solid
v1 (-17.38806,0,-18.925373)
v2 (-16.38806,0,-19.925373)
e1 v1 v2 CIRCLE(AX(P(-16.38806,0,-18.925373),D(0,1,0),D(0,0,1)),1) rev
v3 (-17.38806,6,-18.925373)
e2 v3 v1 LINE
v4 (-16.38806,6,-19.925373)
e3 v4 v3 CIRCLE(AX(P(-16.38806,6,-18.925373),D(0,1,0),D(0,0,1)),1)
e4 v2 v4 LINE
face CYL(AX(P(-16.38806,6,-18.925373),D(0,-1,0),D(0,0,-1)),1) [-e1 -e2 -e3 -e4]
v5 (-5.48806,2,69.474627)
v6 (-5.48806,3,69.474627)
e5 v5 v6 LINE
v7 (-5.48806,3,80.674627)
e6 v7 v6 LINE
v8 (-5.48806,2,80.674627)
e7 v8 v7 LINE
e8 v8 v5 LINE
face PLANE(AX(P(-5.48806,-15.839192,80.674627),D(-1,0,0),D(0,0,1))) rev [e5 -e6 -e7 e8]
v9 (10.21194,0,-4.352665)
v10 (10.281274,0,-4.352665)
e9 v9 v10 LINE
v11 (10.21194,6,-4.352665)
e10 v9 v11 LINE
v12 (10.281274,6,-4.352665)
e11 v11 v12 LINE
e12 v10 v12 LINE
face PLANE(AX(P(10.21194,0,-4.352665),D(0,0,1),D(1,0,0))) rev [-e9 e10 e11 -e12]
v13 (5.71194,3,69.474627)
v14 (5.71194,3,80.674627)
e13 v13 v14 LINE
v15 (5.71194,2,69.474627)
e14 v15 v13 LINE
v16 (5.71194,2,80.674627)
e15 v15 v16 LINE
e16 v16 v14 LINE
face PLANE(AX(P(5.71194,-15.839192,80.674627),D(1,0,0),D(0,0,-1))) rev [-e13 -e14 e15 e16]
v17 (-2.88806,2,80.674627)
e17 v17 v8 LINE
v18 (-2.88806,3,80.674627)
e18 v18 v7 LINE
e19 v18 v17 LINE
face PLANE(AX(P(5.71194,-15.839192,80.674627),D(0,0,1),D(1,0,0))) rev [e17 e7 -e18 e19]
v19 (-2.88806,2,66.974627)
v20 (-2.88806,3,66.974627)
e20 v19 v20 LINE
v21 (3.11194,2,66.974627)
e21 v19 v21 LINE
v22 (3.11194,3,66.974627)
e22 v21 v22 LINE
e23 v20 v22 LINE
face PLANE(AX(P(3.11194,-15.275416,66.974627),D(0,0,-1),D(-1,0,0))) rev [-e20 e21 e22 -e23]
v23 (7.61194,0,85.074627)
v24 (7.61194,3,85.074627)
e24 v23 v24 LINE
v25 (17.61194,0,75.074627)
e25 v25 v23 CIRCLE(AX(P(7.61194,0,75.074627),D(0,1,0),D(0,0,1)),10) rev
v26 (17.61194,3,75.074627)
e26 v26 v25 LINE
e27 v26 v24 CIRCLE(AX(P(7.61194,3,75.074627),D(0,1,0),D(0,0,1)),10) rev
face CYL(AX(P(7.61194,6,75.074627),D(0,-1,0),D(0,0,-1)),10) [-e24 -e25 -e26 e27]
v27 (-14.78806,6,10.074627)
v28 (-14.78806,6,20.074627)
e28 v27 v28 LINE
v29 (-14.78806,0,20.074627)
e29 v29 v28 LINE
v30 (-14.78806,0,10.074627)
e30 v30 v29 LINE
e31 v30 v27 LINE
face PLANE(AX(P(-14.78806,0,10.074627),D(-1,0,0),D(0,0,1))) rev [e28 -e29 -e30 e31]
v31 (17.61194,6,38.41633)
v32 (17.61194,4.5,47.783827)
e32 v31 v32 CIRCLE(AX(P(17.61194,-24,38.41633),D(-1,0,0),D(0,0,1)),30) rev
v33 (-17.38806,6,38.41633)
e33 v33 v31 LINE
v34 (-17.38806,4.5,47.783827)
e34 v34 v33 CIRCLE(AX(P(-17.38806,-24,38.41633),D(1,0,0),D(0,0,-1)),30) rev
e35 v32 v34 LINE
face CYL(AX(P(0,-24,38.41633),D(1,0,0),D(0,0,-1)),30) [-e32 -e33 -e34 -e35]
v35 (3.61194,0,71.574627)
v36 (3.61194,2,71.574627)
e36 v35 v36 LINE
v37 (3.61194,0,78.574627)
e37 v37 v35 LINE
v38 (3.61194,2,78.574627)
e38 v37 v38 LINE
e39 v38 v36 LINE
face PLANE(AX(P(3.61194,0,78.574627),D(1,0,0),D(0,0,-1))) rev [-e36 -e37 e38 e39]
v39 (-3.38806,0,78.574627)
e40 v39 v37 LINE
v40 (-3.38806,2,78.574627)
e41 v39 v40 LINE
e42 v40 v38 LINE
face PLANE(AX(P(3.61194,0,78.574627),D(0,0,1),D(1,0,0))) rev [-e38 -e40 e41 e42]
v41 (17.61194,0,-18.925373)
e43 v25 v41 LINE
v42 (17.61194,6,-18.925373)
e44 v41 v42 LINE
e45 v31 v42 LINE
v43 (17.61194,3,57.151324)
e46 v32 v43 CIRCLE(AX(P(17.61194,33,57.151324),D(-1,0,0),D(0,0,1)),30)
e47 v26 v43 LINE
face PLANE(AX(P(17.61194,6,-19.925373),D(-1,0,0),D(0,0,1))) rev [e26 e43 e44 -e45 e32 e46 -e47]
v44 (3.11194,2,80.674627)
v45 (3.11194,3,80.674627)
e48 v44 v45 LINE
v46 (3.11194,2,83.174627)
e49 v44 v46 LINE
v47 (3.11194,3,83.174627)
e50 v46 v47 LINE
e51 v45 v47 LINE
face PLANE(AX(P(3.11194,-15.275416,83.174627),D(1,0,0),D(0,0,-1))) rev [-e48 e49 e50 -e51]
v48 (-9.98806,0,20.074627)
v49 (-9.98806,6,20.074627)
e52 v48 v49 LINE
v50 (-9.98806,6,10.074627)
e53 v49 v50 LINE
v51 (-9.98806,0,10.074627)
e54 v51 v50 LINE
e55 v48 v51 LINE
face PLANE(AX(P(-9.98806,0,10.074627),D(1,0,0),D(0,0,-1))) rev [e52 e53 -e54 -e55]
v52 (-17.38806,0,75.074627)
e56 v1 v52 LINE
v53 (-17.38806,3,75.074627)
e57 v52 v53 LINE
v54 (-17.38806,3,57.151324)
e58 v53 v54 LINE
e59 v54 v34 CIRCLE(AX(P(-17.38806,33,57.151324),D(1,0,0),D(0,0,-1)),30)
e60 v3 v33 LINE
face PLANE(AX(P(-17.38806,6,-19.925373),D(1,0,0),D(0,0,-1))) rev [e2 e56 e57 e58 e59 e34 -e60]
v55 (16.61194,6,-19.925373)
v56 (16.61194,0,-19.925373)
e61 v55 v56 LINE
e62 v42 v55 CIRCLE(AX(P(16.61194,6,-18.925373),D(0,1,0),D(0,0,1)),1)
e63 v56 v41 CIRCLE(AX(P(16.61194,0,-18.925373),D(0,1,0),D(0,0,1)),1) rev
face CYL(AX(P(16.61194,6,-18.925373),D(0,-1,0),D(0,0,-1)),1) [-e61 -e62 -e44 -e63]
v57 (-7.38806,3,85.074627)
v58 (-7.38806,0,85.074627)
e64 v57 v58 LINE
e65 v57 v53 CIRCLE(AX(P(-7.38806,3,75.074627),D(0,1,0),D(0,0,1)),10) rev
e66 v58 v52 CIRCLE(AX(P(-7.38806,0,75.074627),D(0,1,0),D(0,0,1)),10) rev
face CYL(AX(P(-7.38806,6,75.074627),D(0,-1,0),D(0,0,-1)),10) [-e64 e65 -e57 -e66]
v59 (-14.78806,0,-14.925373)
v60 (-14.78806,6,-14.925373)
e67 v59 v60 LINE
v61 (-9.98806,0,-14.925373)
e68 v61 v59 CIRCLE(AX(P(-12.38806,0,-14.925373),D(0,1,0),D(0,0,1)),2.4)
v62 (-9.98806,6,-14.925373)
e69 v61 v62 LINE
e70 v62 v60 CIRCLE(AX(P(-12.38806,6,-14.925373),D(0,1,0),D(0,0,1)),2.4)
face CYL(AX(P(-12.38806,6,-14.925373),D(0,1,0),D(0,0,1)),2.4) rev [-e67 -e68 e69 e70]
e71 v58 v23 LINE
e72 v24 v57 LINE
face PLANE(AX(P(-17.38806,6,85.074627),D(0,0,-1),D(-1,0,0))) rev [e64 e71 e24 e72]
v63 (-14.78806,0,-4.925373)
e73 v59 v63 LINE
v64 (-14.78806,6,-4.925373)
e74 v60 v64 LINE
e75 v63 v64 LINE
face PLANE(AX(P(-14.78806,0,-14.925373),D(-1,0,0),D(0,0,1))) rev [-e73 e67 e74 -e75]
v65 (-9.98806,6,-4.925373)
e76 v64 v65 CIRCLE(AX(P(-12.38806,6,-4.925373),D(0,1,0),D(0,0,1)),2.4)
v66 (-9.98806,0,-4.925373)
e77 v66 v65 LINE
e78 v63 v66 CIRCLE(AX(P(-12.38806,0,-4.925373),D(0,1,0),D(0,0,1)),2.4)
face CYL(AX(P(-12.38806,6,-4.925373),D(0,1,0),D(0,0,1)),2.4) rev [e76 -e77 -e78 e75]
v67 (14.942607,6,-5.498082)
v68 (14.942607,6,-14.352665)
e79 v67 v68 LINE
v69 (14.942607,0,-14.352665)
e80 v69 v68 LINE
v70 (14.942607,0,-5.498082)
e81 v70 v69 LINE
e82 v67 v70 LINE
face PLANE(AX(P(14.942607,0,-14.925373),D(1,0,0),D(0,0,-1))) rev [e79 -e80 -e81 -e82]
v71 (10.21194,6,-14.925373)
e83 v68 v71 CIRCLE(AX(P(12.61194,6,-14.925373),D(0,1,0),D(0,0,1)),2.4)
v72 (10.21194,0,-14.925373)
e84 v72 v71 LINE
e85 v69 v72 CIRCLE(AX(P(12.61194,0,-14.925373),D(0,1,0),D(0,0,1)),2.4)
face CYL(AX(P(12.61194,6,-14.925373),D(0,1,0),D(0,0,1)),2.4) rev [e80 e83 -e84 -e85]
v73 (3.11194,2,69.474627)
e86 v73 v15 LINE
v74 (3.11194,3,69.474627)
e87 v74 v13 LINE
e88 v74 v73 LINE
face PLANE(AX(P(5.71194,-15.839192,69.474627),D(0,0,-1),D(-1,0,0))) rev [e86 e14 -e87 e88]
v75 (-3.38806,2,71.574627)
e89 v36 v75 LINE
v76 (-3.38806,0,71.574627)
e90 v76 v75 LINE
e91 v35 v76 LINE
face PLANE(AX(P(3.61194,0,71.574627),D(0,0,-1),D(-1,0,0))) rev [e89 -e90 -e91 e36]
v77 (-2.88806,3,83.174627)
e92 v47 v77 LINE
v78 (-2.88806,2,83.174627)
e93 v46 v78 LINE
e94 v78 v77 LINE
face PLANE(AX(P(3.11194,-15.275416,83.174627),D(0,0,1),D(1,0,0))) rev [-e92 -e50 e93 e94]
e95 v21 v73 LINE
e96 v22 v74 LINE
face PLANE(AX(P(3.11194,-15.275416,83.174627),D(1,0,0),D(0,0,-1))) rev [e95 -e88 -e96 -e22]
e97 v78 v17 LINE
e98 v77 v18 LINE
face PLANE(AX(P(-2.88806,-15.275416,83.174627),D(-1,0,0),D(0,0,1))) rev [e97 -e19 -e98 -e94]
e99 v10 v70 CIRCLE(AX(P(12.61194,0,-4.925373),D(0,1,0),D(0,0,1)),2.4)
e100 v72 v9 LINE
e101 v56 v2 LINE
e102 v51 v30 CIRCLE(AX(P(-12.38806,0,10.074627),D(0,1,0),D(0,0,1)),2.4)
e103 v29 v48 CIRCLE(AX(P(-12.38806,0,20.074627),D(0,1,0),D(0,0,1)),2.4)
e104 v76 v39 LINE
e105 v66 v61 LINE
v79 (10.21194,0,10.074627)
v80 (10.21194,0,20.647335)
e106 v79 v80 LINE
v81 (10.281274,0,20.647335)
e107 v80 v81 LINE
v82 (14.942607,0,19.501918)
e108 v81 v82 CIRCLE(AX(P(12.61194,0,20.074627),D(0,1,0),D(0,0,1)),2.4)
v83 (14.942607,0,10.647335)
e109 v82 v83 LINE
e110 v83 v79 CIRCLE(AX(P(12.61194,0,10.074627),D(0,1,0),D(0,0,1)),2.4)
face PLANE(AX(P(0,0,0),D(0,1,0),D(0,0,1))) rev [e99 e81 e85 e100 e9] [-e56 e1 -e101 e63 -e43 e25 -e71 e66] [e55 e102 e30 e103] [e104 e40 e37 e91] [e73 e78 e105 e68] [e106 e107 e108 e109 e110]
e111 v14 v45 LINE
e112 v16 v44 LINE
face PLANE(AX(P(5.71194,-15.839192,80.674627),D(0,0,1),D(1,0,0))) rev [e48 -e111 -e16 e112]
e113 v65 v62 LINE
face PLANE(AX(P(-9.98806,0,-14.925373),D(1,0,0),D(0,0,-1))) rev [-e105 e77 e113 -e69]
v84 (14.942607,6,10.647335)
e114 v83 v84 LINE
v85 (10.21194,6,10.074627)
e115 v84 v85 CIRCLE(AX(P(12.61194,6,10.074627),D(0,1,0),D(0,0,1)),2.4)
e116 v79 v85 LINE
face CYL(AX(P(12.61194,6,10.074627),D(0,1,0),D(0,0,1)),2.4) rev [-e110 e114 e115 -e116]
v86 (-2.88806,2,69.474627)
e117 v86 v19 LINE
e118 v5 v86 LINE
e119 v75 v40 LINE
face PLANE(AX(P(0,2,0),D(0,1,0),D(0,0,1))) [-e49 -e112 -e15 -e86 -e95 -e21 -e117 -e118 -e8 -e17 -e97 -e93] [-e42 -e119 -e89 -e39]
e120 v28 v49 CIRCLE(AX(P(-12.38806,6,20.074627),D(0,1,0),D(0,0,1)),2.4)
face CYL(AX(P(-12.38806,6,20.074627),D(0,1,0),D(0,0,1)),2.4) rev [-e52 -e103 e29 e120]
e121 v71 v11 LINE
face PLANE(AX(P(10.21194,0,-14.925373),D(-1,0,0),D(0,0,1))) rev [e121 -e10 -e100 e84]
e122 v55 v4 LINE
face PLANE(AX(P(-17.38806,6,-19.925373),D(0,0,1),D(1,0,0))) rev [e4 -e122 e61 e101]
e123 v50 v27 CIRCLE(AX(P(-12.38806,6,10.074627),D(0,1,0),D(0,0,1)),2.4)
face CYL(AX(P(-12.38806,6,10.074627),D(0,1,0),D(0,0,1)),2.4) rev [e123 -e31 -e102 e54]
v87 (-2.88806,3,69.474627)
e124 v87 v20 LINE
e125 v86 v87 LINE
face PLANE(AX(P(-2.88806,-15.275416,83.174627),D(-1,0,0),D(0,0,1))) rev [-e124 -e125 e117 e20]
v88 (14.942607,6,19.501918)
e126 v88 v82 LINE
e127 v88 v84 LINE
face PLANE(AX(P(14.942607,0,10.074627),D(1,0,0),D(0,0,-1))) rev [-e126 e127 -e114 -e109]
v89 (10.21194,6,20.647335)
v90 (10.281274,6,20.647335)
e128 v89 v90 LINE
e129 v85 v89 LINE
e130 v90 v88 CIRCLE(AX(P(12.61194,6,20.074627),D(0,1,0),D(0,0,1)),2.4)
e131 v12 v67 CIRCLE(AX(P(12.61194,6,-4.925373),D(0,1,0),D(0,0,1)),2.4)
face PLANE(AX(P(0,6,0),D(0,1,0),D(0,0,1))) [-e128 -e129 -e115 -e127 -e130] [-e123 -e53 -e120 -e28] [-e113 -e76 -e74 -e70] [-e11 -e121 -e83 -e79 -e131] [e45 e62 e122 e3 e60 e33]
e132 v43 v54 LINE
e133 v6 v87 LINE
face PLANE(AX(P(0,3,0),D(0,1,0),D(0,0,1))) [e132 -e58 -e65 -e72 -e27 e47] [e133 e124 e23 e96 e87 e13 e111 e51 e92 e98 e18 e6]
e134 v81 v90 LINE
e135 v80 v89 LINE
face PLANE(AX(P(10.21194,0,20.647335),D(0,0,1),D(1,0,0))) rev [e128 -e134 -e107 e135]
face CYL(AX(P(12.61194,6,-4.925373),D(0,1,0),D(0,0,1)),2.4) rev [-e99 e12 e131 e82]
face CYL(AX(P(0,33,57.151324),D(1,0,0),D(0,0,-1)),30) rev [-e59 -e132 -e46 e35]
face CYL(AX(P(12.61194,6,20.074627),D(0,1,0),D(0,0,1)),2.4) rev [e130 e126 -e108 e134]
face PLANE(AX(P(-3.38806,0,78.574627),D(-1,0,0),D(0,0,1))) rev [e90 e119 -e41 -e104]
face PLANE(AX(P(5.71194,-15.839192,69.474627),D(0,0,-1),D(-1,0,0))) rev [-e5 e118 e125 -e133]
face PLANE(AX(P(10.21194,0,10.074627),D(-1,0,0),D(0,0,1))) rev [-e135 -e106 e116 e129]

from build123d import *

# Parameters (mm, degrees)
SKETCH1_W            = 35
SKETCH1_H            = 105
BOSS_EXTRUDE1_DEPTH  = 6
M4_CLEARANCE_HOLE1_D = 4.8
LPATTERN2_COUNT      = 2
LPATTERN2_PITCH      = 10
SKETCH5_W            = 4.8
SKETCH5_H            = 10
SKETCH5_W_2          = 4.730666207
SKETCH5_H_2          = 10.572708501
CUT_EXTRUDE1_DEPTH   = 88.085432636
SKETCH6_W            = 11.2
SKETCH6_H            = 11.2
CUT_EXTRUDE2_DEPTH   = 4
SKETCH7_W            = 7
SKETCH7_H            = 7
CUT_EXTRUDE3_DEPTH   = 87.970527062
SKETCH8_W            = 6
SKETCH8_H            = 16.2
CUT_EXTRUDE4_DEPTH   = 4
FILLET1_R            = 10
CUT_EXTRUDE5_START   = -6
SKETCH9_W            = 37.049954943
SKETCH9_H            = 41
CUT_EXTRUDE5_DEPTH   = 3
FILLET2_R            = 30
FILLET3_R            = 30
FILLET4_R            = 1


with BuildPart() as part:
    # Sketch1 → Boss-Extrude1 (new body)
    with BuildSketch(Plane(origin=(0, 0, 0), x_dir=(1, 0, 0), z_dir=(0, 1, 0))):
        with Locations((0.111940299, -32.574626866)):
            Rectangle(SKETCH1_W, SKETCH1_H)
    extrude(amount=BOSS_EXTRUDE1_DEPTH)

    # M4 Clearance Hole1 (through all)
    with Locations(Plane(origin=(0, 6, 0), x_dir=(1, 0, 0), z_dir=(0, 1, 0))):
        with Locations((-12.388059701, 14.925373134), (12.611940299, 14.925373134), (12.611940299, -10.074626866), (-12.388059701, -10.074626866)):
            m4_clearance_hole1 = Hole(M4_CLEARANCE_HOLE1_D / 2)

    # LPattern2: M4 Clearance Hole1 ×2
    with Locations(*[(0, 0, i * LPATTERN2_PITCH) for i in range(1, LPATTERN2_COUNT)]):
        add(m4_clearance_hole1, mode=Mode.SUBTRACT)

    # Sketch5 → Cut-Extrude1 (cut, through all)
    with BuildSketch(Plane(origin=(0, 6, 0), x_dir=(1, 0, 0), z_dir=(0, 1, 0))):
        with Locations((-12.388059701, 9.925373134)):
            Rectangle(SKETCH5_W, SKETCH5_H)
        with Locations((-12.388059701, -15.074626866)):
            Rectangle(SKETCH5_W, SKETCH5_H)
        with Locations((12.577273403, 9.639018884)):
            Rectangle(SKETCH5_W_2, SKETCH5_H_2)
        with Locations((12.577273403, -15.360981116)):
            Rectangle(SKETCH5_W_2, SKETCH5_H_2)
    extrude(amount=-CUT_EXTRUDE1_DEPTH, mode=Mode.SUBTRACT)

    # Sketch6 → Cut-Extrude2 (cut)
    with BuildSketch(Plane(origin=(0, 6, 0), x_dir=(1, 0, 0), z_dir=(0, 1, 0))):
        with Locations((0.111940299, -75.074626866)):
            Rectangle(SKETCH6_W, SKETCH6_H)
    extrude(amount=-CUT_EXTRUDE2_DEPTH, mode=Mode.SUBTRACT)

    # Sketch7 → Cut-Extrude3 (cut, through all)
    with BuildSketch(Plane(origin=(0, 2, 0), x_dir=(1, 0, 0), z_dir=(0, 1, 0))):
        with Locations((0.111940299, -75.074626866)):
            Rectangle(SKETCH7_W, SKETCH7_H)
    extrude(amount=-CUT_EXTRUDE3_DEPTH, mode=Mode.SUBTRACT)

    # Sketch8 → Cut-Extrude4 (cut)
    with BuildSketch(Plane(origin=(0, 6, 0), x_dir=(1, 0, 0), z_dir=(0, 1, 0))):
        with Locations((0.111940299, -75.074626866)):
            Rectangle(SKETCH8_W, SKETCH8_H)
    extrude(amount=-CUT_EXTRUDE4_DEPTH, mode=Mode.SUBTRACT)

    # Fillet1
    fillet1_edges = [part.edges().sort_by_distance(p)[0] for p in [
        (17.611940299, 3, 85.074626866),
        (-17.388059701, 3, 85.074626866),
    ]]
    fillet(fillet1_edges, radius=FILLET1_R)

    # Sketch9 → Cut-Extrude5 (cut)
    with BuildSketch(Plane.XZ.offset(CUT_EXTRUDE5_START)):
        with Locations((1.136917771, 64.574626866)):
            Rectangle(SKETCH9_W, SKETCH9_H)
    extrude(amount=CUT_EXTRUDE5_DEPTH, mode=Mode.SUBTRACT)

    # Fillet2
    # the kernel refuses this fillet: 30 mm, written as the material it adds along each edge
    with BuildSketch(Plane(origin=(-17.388059701, 3, 44.074626866), x_dir=(0, 1, 0), z_dir=(1, 0, 0))) as fillet2_piece_1:
        with BuildLine():
            CenterArc((30, 13.076696831), FILLET2_R, 180, 25.841932763)
            Line((0, 13.076696831), (-0.6, 13.076696831))
            Line((-0.6, 13.076696831), (-0.6, 0))
            Line((-0.6, 0), (0, -0.6))
            ThreePointArc((0, -0.6), (1.5, -0.6), (2.46, -0.261533937))
            Line((2.46, -0.261533937), (3, 0))
        make_face()
    extrude(amount=35)

    # Fillet3
    fillet3_edges = [part.edges().sort_by_distance(p)[0] for p in [
        (0.111940299, 6, 44.074626866),
    ]]
    fillet(fillet3_edges, radius=FILLET3_R)

    # Fillet4
    fillet4_edges = [part.edges().sort_by_distance(p)[0] for p in [
        (-17.388059701, 3, -19.925373134),
        (17.611940299, 3, -19.925373134),
    ]]
    fillet(fillet4_edges, radius=FILLET4_R)


solid = part.part
